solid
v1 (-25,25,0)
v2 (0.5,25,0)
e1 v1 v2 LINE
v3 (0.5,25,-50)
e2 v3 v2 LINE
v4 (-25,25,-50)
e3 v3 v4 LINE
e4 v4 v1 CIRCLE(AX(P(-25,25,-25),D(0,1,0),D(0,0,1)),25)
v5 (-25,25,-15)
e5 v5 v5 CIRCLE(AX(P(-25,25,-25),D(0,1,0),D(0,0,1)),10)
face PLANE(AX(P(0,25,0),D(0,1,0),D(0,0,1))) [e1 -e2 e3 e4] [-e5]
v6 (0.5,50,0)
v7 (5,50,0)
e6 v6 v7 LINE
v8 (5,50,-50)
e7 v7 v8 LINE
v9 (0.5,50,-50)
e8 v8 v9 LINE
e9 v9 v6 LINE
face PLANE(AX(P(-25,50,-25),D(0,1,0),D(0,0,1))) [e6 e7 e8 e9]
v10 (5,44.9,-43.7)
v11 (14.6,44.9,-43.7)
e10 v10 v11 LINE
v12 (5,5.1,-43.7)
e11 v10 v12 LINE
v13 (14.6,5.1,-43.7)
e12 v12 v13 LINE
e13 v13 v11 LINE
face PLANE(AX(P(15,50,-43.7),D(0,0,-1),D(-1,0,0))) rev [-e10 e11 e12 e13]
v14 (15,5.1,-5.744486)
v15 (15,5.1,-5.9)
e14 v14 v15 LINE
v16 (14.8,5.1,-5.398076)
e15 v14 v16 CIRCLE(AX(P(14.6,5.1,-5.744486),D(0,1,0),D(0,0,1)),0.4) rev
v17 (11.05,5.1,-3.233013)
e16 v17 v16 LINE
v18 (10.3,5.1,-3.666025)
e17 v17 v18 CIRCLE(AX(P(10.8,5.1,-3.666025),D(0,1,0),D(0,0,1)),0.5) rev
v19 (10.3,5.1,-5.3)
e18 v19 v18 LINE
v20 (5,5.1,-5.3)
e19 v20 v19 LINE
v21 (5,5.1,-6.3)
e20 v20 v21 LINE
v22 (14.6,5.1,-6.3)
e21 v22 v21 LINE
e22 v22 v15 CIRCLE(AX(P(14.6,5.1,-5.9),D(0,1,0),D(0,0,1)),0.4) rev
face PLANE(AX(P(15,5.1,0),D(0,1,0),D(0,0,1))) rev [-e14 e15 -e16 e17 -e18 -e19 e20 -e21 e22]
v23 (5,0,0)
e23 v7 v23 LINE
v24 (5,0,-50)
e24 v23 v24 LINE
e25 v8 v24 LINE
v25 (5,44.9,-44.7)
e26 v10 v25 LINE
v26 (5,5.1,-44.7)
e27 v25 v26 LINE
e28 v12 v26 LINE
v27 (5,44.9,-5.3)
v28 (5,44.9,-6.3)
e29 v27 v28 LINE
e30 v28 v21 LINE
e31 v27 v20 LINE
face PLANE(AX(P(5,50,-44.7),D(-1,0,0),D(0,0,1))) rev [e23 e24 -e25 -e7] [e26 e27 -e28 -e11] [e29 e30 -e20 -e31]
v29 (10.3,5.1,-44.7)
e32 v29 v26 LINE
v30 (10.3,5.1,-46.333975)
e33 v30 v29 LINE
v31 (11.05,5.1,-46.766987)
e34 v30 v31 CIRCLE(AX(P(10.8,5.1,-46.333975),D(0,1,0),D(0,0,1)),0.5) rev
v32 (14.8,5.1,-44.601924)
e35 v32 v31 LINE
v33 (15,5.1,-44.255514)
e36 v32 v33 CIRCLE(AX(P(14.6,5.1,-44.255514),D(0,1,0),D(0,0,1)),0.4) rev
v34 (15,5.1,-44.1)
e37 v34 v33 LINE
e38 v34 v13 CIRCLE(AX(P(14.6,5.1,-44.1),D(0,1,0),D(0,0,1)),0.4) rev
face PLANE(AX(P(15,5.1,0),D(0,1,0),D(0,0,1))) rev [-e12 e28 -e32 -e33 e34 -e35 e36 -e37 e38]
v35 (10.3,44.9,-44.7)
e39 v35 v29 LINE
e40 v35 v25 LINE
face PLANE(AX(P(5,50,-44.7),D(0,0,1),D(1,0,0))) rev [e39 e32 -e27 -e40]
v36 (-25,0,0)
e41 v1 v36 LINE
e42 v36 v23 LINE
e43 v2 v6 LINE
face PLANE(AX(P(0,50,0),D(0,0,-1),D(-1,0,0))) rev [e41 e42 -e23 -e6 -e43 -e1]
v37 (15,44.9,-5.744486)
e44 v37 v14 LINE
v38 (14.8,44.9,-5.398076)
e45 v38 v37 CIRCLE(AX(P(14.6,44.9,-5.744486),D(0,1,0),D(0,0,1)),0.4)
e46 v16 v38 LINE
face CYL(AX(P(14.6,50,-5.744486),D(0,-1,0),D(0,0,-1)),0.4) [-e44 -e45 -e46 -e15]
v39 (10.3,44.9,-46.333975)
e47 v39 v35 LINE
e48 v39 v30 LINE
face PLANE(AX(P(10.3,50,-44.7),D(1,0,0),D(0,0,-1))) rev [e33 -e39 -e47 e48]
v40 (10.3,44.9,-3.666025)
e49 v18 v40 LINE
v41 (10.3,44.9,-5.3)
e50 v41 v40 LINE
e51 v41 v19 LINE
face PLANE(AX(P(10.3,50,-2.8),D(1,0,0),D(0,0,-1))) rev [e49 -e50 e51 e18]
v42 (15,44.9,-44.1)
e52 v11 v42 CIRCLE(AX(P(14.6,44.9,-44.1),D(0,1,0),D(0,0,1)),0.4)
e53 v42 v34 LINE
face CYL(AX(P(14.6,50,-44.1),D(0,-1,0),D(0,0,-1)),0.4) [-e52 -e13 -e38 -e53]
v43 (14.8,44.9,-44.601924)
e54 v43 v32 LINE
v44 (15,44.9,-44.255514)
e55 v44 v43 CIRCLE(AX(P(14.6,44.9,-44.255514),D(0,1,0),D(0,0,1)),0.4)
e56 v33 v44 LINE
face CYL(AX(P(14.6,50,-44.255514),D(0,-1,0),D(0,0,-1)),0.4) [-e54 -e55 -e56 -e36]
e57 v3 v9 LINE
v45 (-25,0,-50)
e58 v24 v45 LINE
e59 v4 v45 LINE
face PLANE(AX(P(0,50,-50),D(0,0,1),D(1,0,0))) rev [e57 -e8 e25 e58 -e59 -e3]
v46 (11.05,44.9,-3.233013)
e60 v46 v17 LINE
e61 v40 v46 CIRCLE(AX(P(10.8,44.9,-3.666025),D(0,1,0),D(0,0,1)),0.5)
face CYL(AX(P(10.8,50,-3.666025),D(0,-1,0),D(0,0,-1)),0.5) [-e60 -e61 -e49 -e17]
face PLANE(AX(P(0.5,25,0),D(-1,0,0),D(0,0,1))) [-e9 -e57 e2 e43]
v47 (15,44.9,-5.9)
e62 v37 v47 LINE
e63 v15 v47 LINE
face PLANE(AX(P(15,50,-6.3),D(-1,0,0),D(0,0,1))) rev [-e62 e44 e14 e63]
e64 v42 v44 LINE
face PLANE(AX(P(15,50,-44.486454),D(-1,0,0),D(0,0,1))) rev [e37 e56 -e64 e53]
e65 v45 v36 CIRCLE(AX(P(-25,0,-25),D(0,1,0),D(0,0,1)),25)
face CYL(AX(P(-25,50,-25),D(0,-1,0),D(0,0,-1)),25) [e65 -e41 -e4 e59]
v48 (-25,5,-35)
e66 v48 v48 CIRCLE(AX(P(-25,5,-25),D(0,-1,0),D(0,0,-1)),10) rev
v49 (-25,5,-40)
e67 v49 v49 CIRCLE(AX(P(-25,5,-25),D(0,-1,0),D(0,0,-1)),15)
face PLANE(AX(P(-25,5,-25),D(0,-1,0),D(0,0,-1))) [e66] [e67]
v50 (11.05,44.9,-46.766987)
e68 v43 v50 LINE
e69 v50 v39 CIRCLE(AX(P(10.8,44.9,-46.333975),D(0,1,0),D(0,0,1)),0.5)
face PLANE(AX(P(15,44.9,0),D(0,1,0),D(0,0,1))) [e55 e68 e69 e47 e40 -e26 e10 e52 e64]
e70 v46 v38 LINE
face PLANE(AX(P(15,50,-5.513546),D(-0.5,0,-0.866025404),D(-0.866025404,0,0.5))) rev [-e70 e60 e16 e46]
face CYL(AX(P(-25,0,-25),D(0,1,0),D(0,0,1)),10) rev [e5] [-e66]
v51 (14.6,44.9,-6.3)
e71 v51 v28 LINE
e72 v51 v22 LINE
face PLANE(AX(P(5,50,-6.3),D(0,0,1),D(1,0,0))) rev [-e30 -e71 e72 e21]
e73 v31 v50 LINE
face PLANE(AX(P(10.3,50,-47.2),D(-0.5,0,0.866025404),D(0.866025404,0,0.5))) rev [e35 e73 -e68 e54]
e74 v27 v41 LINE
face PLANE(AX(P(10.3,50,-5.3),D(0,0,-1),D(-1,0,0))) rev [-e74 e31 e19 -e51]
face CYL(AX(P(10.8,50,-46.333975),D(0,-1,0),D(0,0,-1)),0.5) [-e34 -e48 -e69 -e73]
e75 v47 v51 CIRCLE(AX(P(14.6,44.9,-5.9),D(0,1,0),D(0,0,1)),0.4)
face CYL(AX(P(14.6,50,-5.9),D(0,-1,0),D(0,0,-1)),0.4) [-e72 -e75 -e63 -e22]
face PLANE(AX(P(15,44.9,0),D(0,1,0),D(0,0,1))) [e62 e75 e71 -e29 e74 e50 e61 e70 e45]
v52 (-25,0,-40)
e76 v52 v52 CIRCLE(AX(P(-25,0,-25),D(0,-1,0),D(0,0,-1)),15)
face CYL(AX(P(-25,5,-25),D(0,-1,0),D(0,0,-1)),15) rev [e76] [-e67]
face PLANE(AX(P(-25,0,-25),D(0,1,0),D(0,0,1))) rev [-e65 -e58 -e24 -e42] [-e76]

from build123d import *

# Parameters (mm, degrees)
BOSS_EXTRUDE2_DEPTH = 50
CUT_EXTRUDE1_START  = -25
CUT_EXTRUDE1_DEPTH  = 25
SKETCH5_R           = 10
CUT_EXTRUDE3_DEPTH  = 76
SKETCH10_R          = 15
CUT_EXTRUDE4_DEPTH  = 5
SKETCH17_W          = 50
SKETCH17_H          = 5.1
CUT_EXTRUDE5_DEPTH  = 90.582364336
FILLET1_R           = 0.4
FILLET2_R           = 0.5


with BuildPart() as part:
    # Sketch3 → Boss-Extrude2 (new body)
    with BuildSketch(Plane(origin=(0, 0, 0), x_dir=(1, 0, 0), z_dir=(0, 1, 0))):
        with BuildLine():
            Line((5, 44.7), (10.3, 44.7))
            Line((10.3, 44.7), (10.3, 47.2))
            Line((10.3, 47.2), (15, 44.486453735))
            Line((15, 44.486453735), (15, 43.7))
            Line((15, 43.7), (5, 43.7))
            Line((5, 43.7), (5, 6.3))
            Line((5, 6.3), (15, 6.3))
            Line((15, 6.3), (15, 5.513546265))
            Line((15, 5.513546265), (10.3, 2.8))
            Line((10.3, 2.8), (10.3, 5.3))
            Line((10.3, 5.3), (5, 5.3))
            Line((5, 5.3), (5, 0))
            Line((5, 0), (0, 0))
            Line((0, 0), (-25, 0))
            ThreePointArc((-25, 0), (-50, 25), (-25, 50))
            Line((-25, 50), (0, 50))
            Line((0, 50), (5, 50))
            Line((5, 50), (5, 44.7))
        make_face()
    extrude(amount=BOSS_EXTRUDE2_DEPTH)

    # Sketch4 → Cut-Extrude1 (cut)
    with BuildSketch(Plane(origin=(0, 50, 0), x_dir=(1, 0, 0), z_dir=(0, 1, 0)).offset(CUT_EXTRUDE1_START)):
        with BuildLine():
            Line((-25, 0), (0, 0))
            Line((0, 0), (0.5, 0))
            Line((0.5, 0), (0.5, 50))
            Line((0.5, 50), (0, 50))
            Line((0, 50), (-25, 50))
            ThreePointArc((-25, 50), (-42.67766953, 42.67766953), (-50, 25))
            ThreePointArc((-50, 25), (-42.67766953, 7.32233047), (-25, 0))
        make_face()
    extrude(amount=CUT_EXTRUDE1_DEPTH, mode=Mode.SUBTRACT)

    # Sketch5 → Cut-Extrude3 (cut, through all)
    with BuildSketch(Plane(origin=(0, 25, 0), x_dir=(1, 0, 0), z_dir=(0, 1, 0))):
        with Locations((-25, 25)):
            Circle(SKETCH5_R)
    extrude(amount=-CUT_EXTRUDE3_DEPTH, mode=Mode.SUBTRACT)

    # Sketch10 → Cut-Extrude4 (cut)
    with BuildSketch(Plane.XZ):
        with Locations((-25, -25)):
            Circle(SKETCH10_R)
    extrude(amount=-CUT_EXTRUDE4_DEPTH, mode=Mode.SUBTRACT)

    # Sketch17 → Cut-Extrude5 (cut, through all)
    with BuildSketch(Plane(origin=(5, 0, 0), x_dir=(0, 0, -1), z_dir=(1, 0, 0))):
        with Locations((25, 47.45)):
            Rectangle(SKETCH17_W, SKETCH17_H)
        with Locations((25, 2.55)):
            Rectangle(SKETCH17_W, SKETCH17_H)
    extrude(amount=CUT_EXTRUDE5_DEPTH, mode=Mode.SUBTRACT)

    # Fillet1
    fillet1_edges = [part.edges().sort_by_distance(p)[0] for p in [
        (15, 25, -43.7),
        (15, 25, -44.486453735),
        (15, 25, -6.3),
        (15, 25, -5.513546265),
    ]]
    fillet(fillet1_edges, radius=FILLET1_R)

    # Fillet2
    fillet2_edges = [part.edges().sort_by_distance(p)[0] for p in [
        (10.3, 25, -47.2),
        (10.3, 25, -2.8),
    ]]
    fillet(fillet2_edges, radius=FILLET2_R)


solid = part.part
